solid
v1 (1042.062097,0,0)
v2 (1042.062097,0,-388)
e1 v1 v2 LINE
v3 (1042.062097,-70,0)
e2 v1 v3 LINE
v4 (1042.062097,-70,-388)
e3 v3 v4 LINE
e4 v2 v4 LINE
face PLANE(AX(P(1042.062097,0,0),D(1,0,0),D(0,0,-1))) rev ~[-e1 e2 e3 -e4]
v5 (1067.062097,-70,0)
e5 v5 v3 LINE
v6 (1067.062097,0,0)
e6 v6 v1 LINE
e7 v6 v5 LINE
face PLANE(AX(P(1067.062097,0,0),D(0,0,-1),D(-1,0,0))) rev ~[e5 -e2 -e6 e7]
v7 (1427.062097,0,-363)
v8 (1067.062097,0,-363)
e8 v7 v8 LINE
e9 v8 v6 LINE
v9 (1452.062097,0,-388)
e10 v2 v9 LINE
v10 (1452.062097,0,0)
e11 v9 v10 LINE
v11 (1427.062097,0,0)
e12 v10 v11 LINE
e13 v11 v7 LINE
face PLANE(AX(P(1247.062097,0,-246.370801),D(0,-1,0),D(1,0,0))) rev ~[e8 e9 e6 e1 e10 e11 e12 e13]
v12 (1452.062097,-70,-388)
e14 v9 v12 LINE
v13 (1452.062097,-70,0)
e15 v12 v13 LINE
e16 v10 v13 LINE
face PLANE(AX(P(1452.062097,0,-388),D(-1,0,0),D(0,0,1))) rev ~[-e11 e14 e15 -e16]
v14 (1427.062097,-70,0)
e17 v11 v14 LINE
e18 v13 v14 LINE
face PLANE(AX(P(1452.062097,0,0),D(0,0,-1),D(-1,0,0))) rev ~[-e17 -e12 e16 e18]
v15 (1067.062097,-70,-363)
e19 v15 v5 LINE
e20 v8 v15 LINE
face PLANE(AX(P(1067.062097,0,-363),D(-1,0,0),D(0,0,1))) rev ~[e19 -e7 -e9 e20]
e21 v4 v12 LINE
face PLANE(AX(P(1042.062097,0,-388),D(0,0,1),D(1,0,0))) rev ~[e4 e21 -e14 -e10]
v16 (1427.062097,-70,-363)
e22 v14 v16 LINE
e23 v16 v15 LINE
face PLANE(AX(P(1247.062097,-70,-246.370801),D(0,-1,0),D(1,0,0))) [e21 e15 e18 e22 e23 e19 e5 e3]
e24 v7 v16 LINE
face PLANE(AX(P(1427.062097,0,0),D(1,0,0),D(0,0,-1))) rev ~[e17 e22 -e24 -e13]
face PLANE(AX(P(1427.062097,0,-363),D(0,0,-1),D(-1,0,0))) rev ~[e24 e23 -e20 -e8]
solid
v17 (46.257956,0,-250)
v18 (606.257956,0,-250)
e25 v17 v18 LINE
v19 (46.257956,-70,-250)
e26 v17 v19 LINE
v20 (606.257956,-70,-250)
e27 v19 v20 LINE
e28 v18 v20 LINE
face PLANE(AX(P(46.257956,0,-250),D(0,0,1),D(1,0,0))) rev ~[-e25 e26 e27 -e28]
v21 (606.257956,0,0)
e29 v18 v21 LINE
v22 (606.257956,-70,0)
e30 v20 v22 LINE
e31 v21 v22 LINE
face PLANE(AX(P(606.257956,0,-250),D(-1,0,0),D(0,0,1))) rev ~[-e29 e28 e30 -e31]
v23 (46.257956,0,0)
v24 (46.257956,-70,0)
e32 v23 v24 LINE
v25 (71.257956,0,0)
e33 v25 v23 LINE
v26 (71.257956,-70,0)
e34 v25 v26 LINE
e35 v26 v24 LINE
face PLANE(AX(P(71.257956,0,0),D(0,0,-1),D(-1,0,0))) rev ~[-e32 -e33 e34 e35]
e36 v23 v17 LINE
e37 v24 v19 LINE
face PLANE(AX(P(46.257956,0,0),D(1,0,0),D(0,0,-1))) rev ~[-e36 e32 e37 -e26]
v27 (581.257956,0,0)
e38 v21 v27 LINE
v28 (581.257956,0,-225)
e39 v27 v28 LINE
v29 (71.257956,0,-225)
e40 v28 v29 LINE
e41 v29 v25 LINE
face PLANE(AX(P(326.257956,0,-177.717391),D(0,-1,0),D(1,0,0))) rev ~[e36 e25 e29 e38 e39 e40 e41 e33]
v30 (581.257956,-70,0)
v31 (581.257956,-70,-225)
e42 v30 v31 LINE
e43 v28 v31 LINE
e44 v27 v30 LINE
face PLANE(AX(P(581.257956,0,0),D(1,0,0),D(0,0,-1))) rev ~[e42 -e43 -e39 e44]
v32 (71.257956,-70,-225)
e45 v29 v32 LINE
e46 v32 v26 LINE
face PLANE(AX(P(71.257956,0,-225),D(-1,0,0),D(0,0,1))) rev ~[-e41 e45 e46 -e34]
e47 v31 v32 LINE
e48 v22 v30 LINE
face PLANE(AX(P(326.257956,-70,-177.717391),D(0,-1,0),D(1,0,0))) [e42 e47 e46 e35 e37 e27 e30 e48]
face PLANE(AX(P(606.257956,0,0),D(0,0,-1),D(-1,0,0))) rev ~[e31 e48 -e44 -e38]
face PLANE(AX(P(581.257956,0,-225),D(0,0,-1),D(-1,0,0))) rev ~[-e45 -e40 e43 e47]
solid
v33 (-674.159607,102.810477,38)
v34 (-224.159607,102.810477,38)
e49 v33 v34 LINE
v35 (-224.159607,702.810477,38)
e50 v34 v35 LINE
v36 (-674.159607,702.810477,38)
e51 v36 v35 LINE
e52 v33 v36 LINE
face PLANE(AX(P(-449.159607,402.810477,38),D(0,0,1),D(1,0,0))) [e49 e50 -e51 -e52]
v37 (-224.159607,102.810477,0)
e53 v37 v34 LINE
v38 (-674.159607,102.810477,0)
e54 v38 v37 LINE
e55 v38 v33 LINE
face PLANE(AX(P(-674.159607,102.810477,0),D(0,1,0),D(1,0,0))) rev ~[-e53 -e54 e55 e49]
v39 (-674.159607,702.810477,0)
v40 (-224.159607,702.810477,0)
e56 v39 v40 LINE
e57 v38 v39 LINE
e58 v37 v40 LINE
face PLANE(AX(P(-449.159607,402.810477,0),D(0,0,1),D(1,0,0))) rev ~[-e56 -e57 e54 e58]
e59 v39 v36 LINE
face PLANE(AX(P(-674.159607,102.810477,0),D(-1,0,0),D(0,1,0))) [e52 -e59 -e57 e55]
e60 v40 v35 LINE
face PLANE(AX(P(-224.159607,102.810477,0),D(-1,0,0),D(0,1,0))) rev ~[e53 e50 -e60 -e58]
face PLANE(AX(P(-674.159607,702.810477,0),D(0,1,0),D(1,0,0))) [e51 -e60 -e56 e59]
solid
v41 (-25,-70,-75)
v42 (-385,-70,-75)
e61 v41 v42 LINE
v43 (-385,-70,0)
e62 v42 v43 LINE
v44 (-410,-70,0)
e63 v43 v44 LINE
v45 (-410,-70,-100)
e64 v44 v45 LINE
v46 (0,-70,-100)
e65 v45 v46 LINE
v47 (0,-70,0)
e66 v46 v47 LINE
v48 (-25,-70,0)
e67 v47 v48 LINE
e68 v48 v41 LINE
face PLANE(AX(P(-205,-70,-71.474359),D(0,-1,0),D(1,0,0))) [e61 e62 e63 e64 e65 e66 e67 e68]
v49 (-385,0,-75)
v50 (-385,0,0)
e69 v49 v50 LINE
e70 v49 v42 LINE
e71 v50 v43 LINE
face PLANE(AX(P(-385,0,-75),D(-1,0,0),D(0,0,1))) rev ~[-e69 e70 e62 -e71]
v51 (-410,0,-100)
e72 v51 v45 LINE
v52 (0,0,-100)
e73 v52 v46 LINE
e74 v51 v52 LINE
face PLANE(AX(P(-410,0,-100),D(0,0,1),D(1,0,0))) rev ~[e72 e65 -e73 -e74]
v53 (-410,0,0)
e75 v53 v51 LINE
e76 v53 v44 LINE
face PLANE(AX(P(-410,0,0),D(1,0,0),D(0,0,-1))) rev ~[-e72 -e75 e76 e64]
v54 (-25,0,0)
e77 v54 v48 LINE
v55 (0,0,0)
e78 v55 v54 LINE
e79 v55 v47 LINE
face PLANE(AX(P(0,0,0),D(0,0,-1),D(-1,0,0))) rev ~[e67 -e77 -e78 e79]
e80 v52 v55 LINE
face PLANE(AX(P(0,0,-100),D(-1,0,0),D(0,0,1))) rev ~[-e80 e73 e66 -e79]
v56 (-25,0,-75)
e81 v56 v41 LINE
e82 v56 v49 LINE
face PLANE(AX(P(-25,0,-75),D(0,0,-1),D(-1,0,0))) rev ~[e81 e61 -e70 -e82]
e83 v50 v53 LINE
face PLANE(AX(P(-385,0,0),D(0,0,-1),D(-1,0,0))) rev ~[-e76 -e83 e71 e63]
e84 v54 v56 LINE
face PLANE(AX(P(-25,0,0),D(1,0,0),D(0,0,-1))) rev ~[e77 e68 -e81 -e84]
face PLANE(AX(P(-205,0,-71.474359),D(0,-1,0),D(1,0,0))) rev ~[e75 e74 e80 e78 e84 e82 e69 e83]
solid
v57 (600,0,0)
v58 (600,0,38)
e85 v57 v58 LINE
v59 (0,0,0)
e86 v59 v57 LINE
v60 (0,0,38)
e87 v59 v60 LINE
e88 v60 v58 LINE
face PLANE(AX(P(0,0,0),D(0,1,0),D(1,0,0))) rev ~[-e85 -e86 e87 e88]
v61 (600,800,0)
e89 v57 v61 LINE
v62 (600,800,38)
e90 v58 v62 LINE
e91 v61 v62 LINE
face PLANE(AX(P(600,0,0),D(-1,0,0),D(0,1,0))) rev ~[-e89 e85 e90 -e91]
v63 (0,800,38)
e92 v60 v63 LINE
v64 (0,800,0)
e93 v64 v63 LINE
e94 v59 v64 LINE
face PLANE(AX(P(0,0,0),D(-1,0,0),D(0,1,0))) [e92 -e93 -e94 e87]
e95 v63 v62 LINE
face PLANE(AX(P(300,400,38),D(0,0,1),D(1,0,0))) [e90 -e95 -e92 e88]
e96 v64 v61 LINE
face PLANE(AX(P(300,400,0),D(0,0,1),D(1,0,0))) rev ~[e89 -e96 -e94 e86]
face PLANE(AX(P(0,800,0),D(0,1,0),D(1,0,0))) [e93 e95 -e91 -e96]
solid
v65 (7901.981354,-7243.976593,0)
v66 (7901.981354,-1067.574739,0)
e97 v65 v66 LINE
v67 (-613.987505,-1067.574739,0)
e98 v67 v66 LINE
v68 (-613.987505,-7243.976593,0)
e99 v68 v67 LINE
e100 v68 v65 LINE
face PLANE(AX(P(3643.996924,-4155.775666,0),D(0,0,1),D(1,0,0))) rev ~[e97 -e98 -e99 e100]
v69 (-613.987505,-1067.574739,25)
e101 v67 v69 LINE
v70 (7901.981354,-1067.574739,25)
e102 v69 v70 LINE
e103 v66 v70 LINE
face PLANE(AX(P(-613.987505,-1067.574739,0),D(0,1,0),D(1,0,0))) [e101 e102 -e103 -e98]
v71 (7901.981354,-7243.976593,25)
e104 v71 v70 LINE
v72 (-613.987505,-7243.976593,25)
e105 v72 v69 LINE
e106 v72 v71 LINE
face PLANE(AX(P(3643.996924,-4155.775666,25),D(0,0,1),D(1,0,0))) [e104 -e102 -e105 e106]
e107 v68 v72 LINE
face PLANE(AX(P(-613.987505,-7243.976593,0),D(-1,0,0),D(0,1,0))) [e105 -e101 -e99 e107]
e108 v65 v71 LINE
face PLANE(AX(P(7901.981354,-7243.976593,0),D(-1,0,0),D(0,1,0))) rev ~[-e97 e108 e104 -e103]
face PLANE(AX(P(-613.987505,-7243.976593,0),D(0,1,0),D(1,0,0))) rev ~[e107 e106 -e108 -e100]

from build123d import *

# Parameters (mm, degrees)
F0_W      = 600
F0_H      = 800
F1_DEPTH  = 38
F3_DEPTH  = 70
F5_DEPTH  = 70
F9_DEPTH  = 70
F10_W     = 450
F10_H     = 600
F11_DEPTH = 38
F12_W     = 8515.9688591957
F12_H     = 6176.4018535614
F13_DEPTH = 25


# Not quite as in the source:
# - a feature of the source that left no trace in its solid (it failed there, or was rolled back) is left out


with BuildPart() as f1:
    # F0 (on Top) → F1 (new body)
    with BuildSketch(Plane.XY):
        with Locations((300, 400)):
            Rectangle(F0_W, F0_H)
    extrude(amount=F1_DEPTH)


with BuildPart() as f3:
    # F2 (on Front) → F3 (new body)
    with BuildSketch(Plane.XZ):
        Polygon((71.2579559533, 0), (46.2579559533, 0), (46.2579559533, -250), (606.2579559533, -250), (606.2579559533, 0), (581.2579559533, 0), (581.2579559533, -225), (71.2579559533, -225), align=None)
    extrude(amount=F3_DEPTH)


with BuildPart() as f5:
    # F4 (on Front) → F5 (new body)
    with BuildSketch(Plane.XZ):
        Polygon((0, -100), (0, 0), (-25, 0), (-25, -75), (-385, -75), (-385, 0), (-410, 0), (-410, -100), align=None)
    extrude(amount=F5_DEPTH)


with BuildPart() as f9:
    # F8 (on Front) → F9 (new body)
    with BuildSketch(Plane.XZ):
        Polygon((1067.0620972831, 0), (1042.0620972831, 0), (1042.0620972831, -388), (1452.0620972831, -388), (1452.0620972831, 0), (1427.0620972831, 0), (1427.0620972831, -363), (1067.0620972831, -363), align=None)
    extrude(amount=F9_DEPTH)


with BuildPart() as f11:
    # F10 (on Top) → F11 (new body)
    with BuildSketch(Plane.XY):
        with Locations((-449.1596068184, 402.8104767203)):
            Rectangle(F10_W, F10_H)
    extrude(amount=F11_DEPTH)


with BuildPart() as f13:
    # F12 (on Top) → F13 (new body)
    with BuildSketch(Plane.XY):
        with Locations((3643.9969241619, -4155.7756662369)):
            Rectangle(F12_W, F12_H)
    extrude(amount=F13_DEPTH)


solid = Compound([f1.part, f3.part, f5.part, f9.part, f11.part, f13.part])
